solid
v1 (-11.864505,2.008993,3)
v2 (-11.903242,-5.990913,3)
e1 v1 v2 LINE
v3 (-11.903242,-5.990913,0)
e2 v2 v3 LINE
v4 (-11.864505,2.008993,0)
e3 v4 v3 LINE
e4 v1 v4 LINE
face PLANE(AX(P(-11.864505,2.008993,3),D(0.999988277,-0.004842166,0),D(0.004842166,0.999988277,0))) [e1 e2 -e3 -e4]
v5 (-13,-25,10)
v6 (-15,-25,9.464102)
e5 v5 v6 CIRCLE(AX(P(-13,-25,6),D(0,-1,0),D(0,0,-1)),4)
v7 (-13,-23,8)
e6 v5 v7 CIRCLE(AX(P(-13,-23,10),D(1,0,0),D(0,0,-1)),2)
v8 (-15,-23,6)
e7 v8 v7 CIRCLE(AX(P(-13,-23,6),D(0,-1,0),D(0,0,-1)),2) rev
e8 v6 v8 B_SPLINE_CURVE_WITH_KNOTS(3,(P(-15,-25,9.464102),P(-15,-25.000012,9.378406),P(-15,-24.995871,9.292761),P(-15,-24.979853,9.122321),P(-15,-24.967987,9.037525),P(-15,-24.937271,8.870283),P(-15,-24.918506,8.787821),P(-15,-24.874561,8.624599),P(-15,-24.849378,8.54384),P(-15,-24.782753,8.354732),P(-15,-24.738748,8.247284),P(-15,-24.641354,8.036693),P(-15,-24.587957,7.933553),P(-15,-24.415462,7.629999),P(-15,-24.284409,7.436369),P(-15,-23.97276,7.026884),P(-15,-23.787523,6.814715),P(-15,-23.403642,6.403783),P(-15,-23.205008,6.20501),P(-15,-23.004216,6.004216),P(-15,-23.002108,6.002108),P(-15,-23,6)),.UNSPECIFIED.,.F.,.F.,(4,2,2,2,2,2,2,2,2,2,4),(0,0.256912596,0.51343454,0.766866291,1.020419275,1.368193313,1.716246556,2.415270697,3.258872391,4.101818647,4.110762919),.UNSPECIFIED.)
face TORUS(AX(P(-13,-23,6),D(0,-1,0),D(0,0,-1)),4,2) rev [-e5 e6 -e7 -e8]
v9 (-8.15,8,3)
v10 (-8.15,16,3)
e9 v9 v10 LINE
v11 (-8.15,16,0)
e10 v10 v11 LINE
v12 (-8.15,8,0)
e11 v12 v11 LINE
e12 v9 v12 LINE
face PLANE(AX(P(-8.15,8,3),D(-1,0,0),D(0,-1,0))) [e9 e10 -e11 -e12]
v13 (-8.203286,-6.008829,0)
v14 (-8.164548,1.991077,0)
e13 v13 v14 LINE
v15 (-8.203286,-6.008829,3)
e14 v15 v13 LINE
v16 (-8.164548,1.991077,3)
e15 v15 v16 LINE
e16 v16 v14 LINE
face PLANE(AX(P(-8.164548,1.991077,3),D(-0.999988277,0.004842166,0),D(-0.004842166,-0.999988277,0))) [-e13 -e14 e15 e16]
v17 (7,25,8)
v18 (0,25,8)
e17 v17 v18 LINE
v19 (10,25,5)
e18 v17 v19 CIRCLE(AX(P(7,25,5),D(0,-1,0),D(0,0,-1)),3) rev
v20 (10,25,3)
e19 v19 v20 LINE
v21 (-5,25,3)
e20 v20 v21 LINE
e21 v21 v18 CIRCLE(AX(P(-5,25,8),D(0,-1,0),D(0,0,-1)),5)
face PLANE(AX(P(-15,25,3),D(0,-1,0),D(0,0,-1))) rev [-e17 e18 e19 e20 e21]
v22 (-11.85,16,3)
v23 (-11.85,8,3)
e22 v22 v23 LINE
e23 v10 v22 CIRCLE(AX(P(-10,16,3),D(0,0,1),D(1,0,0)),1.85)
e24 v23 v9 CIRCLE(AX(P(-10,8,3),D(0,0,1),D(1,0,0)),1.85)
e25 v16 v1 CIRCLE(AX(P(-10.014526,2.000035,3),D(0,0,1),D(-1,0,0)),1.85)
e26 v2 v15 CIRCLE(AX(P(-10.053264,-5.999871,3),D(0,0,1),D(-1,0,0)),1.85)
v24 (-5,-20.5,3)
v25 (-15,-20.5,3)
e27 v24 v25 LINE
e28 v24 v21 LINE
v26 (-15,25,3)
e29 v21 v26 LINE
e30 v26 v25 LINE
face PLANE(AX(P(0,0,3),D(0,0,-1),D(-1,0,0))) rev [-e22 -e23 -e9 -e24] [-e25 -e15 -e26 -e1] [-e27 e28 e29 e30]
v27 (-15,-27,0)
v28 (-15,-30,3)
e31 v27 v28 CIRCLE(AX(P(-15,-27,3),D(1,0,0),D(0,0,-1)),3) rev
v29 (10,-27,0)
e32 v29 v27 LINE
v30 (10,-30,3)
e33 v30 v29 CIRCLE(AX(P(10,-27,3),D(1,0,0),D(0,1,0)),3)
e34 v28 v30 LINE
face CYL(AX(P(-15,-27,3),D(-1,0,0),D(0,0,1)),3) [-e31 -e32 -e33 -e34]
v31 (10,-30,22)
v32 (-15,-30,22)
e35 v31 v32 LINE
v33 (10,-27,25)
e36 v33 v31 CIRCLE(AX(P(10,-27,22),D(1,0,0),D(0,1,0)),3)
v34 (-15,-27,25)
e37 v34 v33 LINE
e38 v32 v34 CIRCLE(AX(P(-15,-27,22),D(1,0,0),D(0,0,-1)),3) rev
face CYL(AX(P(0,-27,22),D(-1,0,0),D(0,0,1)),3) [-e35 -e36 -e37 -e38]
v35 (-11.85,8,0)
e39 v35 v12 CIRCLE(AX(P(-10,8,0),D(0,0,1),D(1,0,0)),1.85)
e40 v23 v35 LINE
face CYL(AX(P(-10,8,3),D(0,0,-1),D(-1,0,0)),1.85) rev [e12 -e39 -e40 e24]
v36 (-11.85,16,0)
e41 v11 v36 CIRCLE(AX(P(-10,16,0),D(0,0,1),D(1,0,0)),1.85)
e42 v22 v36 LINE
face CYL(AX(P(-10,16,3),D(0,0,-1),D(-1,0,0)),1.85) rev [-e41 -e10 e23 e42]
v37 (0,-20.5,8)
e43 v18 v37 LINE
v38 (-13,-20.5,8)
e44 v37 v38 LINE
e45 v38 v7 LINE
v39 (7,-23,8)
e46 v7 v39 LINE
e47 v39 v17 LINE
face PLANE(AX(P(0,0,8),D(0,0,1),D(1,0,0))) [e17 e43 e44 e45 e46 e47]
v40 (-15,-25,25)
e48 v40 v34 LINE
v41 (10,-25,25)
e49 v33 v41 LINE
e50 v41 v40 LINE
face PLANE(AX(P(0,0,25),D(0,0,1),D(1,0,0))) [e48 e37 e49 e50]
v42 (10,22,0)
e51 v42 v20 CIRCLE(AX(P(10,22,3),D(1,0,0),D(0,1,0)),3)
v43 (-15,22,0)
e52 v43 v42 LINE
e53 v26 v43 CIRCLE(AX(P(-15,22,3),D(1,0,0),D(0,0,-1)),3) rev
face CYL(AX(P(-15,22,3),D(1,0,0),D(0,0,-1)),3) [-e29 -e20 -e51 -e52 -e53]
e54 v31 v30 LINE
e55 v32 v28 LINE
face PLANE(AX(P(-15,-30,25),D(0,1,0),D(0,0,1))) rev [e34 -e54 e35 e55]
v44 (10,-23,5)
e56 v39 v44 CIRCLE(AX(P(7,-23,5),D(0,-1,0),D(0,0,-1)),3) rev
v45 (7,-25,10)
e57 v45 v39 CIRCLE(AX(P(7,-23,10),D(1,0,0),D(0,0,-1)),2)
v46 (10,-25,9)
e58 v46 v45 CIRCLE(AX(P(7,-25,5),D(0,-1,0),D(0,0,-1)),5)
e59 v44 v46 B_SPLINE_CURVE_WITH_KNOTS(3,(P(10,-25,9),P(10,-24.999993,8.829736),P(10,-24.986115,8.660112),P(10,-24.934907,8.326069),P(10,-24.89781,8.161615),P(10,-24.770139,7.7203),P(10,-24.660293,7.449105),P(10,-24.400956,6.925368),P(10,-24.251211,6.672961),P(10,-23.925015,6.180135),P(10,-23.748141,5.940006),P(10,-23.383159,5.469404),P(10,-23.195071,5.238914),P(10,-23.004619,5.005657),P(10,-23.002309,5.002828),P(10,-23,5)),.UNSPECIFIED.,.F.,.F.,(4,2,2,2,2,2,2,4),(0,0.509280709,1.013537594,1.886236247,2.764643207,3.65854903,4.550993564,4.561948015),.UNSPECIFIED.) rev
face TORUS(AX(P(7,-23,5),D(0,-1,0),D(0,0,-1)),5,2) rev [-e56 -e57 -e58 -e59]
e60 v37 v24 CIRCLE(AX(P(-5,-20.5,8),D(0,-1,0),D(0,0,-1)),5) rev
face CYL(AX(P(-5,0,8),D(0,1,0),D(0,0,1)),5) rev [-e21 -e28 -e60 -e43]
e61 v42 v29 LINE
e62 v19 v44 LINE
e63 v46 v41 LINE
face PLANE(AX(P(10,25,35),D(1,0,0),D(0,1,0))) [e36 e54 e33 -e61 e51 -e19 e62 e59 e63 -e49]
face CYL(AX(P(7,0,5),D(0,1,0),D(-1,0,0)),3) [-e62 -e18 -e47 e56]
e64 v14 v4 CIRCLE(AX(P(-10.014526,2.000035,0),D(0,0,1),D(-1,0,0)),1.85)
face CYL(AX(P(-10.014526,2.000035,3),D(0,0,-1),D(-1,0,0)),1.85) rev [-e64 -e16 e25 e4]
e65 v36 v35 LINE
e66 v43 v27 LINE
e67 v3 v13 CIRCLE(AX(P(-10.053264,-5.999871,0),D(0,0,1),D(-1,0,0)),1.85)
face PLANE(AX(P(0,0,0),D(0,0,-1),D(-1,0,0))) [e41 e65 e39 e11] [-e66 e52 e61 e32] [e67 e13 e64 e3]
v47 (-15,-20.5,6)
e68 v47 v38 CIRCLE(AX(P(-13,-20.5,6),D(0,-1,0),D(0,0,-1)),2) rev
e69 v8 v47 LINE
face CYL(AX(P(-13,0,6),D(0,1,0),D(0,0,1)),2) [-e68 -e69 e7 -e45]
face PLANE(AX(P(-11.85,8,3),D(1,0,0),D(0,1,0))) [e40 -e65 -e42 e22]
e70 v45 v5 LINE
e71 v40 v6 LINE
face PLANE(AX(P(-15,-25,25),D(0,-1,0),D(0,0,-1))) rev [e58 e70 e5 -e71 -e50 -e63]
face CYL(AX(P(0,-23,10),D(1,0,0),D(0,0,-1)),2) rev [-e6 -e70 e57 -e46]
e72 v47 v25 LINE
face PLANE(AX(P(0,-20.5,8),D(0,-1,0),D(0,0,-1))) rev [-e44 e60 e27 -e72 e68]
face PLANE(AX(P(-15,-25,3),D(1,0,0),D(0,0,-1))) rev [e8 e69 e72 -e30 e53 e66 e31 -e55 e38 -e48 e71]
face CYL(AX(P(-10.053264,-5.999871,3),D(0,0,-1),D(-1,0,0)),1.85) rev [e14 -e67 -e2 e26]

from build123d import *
from OCP.BRepFilletAPI import BRepFilletAPI_MakeFillet

# Parameters (mm, degrees)
SKETCH1_W           = 30
SKETCH1_H           = 50
BOSS_EXTRUDE1_DEPTH = 3
SKETCH2_W           = 30
SKETCH2_H           = 5
BOSS_EXTRUDE2_DEPTH = 25
BOSS_EXTRUDE4_START = 3
BOSS_EXTRUDE4_DEPTH = 5
SKETCH6_W           = 5
SKETCH6_H           = 55
CUT_EXTRUDE1_DEPTH  = 35
FILLET3_R           = 5
FILLET5_R           = 3
FILLET5_R_2         = 2
FILLET6_R           = 2


with BuildPart() as part:
    # Sketch1 → Boss-Extrude1 (new body)
    with BuildSketch(Plane.XY):
        Rectangle(SKETCH1_W, SKETCH1_H)
        with BuildLine():
            Line((-11.85, 8), (-11.85, 16))
            ThreePointArc((-11.85, 16), (-10, 17.85), (-8.15, 16))
            Line((-8.15, 16), (-8.15, 8))
            ThreePointArc((-8.15, 8), (-10, 6.15), (-11.85, 8))
        make_face(mode=Mode.SUBTRACT)
        with BuildLine():
            Line((-11.864504809, 2.008993176), (-11.903242133, -5.990913037))
            ThreePointArc((-11.903242133, -5.990913037), (-10.062221828, -7.849849355), (-8.203285509, -6.008829049))
            Line((-8.203285509, -6.008829049), (-8.164548185, 1.991077164))
            ThreePointArc((-8.164548185, 1.991077164), (-10.00556849, 3.850013482), (-11.864504809, 2.008993176))
        make_face(mode=Mode.SUBTRACT)
    extrude(amount=BOSS_EXTRUDE1_DEPTH)

    # Sketch2 → Boss-Extrude2 (add)
    with BuildSketch(Plane.XY):
        with Locations((0, -27.5)):
            Rectangle(SKETCH2_W, SKETCH2_H)
    extrude(amount=BOSS_EXTRUDE2_DEPTH)

    # Sketch4 → Boss-Extrude4 (add)
    with BuildSketch(Plane.XY.offset(BOSS_EXTRUDE4_START)):
        Polygon((15, -25), (0, -25), (-15, -25), (-15, -20.5), (0, -20.5), (0, 25), (15, 25), align=None)
    extrude(amount=BOSS_EXTRUDE4_DEPTH)

    # Sketch6 → Cut-Extrude1 (cut)
    with BuildSketch(Plane.XY):
        with Locations((12.5, -2.5)):
            Rectangle(SKETCH6_W, SKETCH6_H)
    extrude(amount=CUT_EXTRUDE1_DEPTH, mode=Mode.SUBTRACT)

    # Fillet3
    fillet3_edges = [part.edges().sort_by_distance(p)[0] for p in [
        (0, 2.25, 3),
    ]]
    fillet(fillet3_edges, radius=FILLET3_R - 0.0001)  # a hair under: the kernel refuses the full size

    # Fillet5
    fillet5_edges_1 = [part.edges().sort_by_distance(p)[0] for p in [
        (-2.5, -30, 0),
        (-2.5, -30, 25),
        (10, 0, 8),
        (-2.5, 25, 0),
    ]]
    fillet5_edges_2 = [part.edges().sort_by_distance(p)[0] for p in [
        (-15, -22.75, 8),
    ]]
    fillet5 = BRepFilletAPI_MakeFillet(part.part.solid().wrapped)
    for e in fillet5_edges_1:
        fillet5.Add(FILLET5_R - 0.0001, e.wrapped)
    for e in fillet5_edges_2:
        fillet5.Add(FILLET5_R_2 - 0.0001, e.wrapped)
    add(Compound.cast(fillet5.Shape()), mode=Mode.REPLACE)  # a hair under: the kernel refuses the full size

    # Fillet6
    fillet6_edges = [part.edges().sort_by_distance(p)[0] for p in [
        (-3, -25, 8),
        (-14.414242852, -25, 7.414242852),
        (9.121349633, -25, 7.121349633),
    ]]
    fillet(fillet6_edges, radius=FILLET6_R)


solid = part.part
